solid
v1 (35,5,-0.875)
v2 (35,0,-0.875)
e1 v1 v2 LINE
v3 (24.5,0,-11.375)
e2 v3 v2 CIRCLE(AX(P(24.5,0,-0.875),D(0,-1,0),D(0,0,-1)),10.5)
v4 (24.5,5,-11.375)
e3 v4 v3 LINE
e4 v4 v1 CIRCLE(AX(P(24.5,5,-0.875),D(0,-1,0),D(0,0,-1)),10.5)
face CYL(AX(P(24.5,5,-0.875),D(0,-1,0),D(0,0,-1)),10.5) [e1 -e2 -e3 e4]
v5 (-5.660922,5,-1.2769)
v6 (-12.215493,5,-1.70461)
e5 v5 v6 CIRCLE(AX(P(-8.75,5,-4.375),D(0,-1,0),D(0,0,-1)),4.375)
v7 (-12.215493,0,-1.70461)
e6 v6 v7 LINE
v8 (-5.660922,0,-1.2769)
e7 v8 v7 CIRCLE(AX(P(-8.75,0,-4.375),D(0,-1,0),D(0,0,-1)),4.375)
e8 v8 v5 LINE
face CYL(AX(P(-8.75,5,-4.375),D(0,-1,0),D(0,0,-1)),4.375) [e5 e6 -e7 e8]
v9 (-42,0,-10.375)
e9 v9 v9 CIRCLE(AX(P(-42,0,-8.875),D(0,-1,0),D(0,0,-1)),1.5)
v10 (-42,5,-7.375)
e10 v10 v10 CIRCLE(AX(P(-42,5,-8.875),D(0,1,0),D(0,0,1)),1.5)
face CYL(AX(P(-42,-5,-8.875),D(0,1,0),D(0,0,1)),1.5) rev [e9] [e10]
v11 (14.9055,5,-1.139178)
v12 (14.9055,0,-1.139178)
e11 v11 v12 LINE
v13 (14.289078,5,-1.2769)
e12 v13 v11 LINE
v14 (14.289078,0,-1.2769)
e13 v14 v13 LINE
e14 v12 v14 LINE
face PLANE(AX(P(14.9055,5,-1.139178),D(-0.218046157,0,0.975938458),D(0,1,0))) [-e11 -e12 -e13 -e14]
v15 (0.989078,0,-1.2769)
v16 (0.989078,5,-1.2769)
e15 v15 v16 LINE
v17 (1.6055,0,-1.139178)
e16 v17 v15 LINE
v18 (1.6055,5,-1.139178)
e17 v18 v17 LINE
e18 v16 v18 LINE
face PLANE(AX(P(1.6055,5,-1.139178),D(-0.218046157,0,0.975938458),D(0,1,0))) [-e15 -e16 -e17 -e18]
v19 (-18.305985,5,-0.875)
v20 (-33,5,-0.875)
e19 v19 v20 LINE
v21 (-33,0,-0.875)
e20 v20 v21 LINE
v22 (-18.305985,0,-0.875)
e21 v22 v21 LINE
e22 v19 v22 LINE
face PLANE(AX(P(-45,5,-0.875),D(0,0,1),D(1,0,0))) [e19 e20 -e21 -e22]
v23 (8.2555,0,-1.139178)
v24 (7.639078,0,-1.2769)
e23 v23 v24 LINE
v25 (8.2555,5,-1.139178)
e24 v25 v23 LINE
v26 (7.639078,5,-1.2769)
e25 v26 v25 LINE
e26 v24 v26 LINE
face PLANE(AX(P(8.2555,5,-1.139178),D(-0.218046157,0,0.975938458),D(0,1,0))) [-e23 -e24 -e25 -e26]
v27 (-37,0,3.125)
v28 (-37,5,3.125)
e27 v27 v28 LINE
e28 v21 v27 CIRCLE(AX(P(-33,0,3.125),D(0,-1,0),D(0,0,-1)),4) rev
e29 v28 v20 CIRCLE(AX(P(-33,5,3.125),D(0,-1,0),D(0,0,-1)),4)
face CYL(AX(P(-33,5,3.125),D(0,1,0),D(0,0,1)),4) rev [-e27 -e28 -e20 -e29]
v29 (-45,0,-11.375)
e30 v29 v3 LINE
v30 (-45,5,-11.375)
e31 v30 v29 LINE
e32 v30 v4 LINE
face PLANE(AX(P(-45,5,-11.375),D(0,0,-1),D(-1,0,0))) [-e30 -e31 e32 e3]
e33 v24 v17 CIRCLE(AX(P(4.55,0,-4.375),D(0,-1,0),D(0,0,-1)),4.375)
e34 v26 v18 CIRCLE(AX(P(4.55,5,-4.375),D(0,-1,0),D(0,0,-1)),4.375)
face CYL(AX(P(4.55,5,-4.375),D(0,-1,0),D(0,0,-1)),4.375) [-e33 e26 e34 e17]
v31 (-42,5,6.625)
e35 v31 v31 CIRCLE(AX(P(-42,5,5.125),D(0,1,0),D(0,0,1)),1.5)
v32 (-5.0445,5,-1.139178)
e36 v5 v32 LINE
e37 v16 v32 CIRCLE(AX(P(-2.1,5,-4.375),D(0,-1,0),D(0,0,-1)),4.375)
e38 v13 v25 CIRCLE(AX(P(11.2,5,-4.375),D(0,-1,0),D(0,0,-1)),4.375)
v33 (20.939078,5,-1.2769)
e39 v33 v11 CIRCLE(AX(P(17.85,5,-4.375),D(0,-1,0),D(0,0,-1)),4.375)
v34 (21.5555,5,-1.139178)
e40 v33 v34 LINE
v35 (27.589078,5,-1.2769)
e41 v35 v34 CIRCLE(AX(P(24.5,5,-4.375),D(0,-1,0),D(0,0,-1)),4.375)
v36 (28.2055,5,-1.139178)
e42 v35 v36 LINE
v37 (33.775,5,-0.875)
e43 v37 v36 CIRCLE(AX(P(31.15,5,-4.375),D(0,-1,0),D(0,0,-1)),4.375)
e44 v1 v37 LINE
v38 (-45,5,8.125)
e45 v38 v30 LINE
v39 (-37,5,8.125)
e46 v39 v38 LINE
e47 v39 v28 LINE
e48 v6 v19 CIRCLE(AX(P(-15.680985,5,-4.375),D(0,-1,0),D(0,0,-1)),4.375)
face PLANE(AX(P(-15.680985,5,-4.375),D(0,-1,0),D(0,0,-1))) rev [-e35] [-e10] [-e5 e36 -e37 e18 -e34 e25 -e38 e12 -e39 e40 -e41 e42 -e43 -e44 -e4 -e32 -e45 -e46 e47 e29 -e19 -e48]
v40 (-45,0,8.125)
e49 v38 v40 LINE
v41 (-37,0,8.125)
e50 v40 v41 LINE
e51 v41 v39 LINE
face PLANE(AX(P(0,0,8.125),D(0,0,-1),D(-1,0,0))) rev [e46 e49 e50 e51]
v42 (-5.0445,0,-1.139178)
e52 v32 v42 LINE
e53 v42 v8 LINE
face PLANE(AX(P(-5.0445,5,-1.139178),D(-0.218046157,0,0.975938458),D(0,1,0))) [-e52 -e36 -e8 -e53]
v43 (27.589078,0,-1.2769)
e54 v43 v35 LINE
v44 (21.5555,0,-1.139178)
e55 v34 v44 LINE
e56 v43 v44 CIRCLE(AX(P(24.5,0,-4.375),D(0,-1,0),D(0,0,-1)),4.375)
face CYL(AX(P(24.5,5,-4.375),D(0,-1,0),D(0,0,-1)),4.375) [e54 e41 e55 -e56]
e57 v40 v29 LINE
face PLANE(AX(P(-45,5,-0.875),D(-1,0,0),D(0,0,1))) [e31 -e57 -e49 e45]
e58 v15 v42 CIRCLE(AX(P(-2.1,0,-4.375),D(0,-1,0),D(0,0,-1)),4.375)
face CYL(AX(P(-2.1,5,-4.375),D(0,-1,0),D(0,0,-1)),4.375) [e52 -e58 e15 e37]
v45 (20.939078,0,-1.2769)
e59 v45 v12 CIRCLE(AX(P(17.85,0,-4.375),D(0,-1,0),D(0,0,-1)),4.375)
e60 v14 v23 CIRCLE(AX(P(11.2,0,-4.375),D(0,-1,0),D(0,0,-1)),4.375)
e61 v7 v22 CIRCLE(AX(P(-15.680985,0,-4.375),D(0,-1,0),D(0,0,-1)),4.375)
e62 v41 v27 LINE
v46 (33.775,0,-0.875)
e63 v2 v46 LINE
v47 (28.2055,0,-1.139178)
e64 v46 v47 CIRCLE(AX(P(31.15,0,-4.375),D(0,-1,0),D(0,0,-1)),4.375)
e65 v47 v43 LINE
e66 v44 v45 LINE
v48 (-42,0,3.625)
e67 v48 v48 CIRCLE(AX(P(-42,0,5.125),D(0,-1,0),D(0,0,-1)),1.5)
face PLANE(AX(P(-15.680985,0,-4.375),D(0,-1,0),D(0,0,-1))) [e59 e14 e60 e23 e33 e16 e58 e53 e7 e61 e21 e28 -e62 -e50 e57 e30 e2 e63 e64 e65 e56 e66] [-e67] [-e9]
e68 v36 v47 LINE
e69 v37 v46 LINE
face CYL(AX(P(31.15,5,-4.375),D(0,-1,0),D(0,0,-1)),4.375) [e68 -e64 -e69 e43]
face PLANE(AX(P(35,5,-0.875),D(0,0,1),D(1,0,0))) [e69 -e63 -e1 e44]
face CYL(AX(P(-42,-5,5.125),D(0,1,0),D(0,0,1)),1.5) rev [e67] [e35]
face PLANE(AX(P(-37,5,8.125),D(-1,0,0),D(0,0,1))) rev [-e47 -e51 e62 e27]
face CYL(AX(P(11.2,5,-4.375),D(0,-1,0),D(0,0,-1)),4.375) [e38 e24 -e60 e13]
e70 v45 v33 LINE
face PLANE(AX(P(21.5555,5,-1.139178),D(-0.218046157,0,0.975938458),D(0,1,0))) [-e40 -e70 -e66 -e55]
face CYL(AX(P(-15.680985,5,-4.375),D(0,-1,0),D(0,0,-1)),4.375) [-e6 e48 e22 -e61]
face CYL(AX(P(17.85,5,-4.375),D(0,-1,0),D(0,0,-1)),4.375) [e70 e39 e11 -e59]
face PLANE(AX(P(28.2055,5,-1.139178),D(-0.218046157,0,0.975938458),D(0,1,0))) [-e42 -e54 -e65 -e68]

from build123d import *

# Parameters (mm, degrees)
BOSS_EXTRUDE1_DEPTH = 5
SKETCH2_W           = 8
SKETCH2_H           = 5
BOSS_EXTRUDE2_DEPTH = 9
FILLET1_R           = 4
SKETCH3_R           = 1.5
CUT_EXTRUDE1_DEPTH  = 10


with BuildPart() as part:
    # Sketch1 → Boss-Extrude1 (new body)
    with BuildSketch(Plane.XZ):
        with BuildLine():
            Line((-45, -0.875), (-45, -11.375))
            Line((-45, -11.375), (24.5, -11.375))
            ThreePointArc((24.5, -11.375), (31.924621202, -8.299621202), (35, -0.875))
            Line((35, -0.875), (33.775, -0.875))
            ThreePointArc((33.775, -0.875), (30.670128687, -0.026396946), (27.825, -1.531586558))
            ThreePointArc((27.825, -1.531586558), (24.5, 0), (21.175, -1.531586558))
            ThreePointArc((21.175, -1.531586558), (17.85, 0), (14.525, -1.531586558))
            ThreePointArc((14.525, -1.531586558), (11.2, 0), (7.875, -1.531586558))
            ThreePointArc((7.875, -1.531586558), (4.55, 0), (1.225, -1.531586558))
            ThreePointArc((1.225, -1.531586558), (-2.1, 0), (-5.425, -1.531586558))
            ThreePointArc((-5.425, -1.531586558), (-8.861439615, -0.00141952), (-12.215492713, -1.704609531))
            ThreePointArc((-12.215492713, -1.704609531), (-15.090502578, -0.040031141), (-18.305985425, -0.875))
            Line((-18.305985425, -0.875), (-45, -0.875))
        make_face()
    extrude(amount=-BOSS_EXTRUDE1_DEPTH)

    # Sketch2 → Boss-Extrude2 (add)
    with BuildSketch(Plane.XY.offset(-0.875)):
        with Locations((-41, 2.5)):
            Rectangle(SKETCH2_W, SKETCH2_H)
    extrude(amount=BOSS_EXTRUDE2_DEPTH)

    # Chamfer1
    # the kernel refuses this chamfer: 0.5, 0.339586842 mm, written as the material it adds along each edge
    with BuildSketch(Plane(origin=(-5.425, 0, -1.531586558), x_dir=(0.6961293101624768, 0, 0.7179164182080768), z_dir=(0, 1, 0))) as chamfer1_piece_1:
        with BuildLine():
            Line((0.546593526, 0), (0.018611268, -0.34666682))
            ThreePointArc((0.018611268, -0.34666682), (0.013013217, -0.178188087), (0, 0))
            ThreePointArc((0, 0), (0.281682829, -0.008536435), (0.546593526, 0))
        make_face()
    extrude(amount=5)
    with BuildSketch(Plane(origin=(1.225, 0, -1.531586558), x_dir=(-0.6795651691098796, 0, 0.7336151449722536), z_dir=(0, 1, 0)), Plane(origin=(7.875, 0, -1.531586558), x_dir=(-0.67956516910988, 0, 0.7336151449722534), z_dir=(0, 1, 0)), Plane(origin=(14.525, 0, -1.531586558), x_dir=(-0.679565169109884, 0, 0.7336151449722498), z_dir=(0, 1, 0)), Plane(origin=(21.175, 0, -1.531586558), x_dir=(-0.6795651691098812, 0, 0.7336151449722523), z_dir=(0, 1, 0)), Plane(origin=(27.825, 0, -1.531586558), x_dir=(-0.6795651691098773, 0, 0.7336151449722558), z_dir=(0, 1, 0))) as chamfer1_piece_2:
        with BuildLine():
            Line((0.347166046, 0), (0.029302401, 0.545807522))
            ThreePointArc((0.029302401, 0.545807522), (0.023624929, 0.280820137), (0, 0))
            ThreePointArc((0, 0), (0.178629479, 0.003441996), (0.347166046, 0))
        make_face()
    extrude(amount=5)

    # Fillet1
    fillet1_edges = [part.edges().sort_by_distance(p)[0] for p in [
        (-37, 2.5, -0.875),
    ]]
    fillet(fillet1_edges, radius=FILLET1_R)

    # Sketch3 → Cut-Extrude1 (cut)
    with BuildSketch(Plane(origin=(0, 5, 0), x_dir=(1, 0, 0), z_dir=(0, 1, 0))):
        with Locations(Location((-42, -5.125, 0), (0, 0, 270))):
            Circle(SKETCH3_R)
        with Locations(Location((-42, 8.875, 0), (0, 0, 270))):
            Circle(SKETCH3_R)
    extrude(amount=-CUT_EXTRUDE1_DEPTH, mode=Mode.SUBTRACT)


solid = part.part
